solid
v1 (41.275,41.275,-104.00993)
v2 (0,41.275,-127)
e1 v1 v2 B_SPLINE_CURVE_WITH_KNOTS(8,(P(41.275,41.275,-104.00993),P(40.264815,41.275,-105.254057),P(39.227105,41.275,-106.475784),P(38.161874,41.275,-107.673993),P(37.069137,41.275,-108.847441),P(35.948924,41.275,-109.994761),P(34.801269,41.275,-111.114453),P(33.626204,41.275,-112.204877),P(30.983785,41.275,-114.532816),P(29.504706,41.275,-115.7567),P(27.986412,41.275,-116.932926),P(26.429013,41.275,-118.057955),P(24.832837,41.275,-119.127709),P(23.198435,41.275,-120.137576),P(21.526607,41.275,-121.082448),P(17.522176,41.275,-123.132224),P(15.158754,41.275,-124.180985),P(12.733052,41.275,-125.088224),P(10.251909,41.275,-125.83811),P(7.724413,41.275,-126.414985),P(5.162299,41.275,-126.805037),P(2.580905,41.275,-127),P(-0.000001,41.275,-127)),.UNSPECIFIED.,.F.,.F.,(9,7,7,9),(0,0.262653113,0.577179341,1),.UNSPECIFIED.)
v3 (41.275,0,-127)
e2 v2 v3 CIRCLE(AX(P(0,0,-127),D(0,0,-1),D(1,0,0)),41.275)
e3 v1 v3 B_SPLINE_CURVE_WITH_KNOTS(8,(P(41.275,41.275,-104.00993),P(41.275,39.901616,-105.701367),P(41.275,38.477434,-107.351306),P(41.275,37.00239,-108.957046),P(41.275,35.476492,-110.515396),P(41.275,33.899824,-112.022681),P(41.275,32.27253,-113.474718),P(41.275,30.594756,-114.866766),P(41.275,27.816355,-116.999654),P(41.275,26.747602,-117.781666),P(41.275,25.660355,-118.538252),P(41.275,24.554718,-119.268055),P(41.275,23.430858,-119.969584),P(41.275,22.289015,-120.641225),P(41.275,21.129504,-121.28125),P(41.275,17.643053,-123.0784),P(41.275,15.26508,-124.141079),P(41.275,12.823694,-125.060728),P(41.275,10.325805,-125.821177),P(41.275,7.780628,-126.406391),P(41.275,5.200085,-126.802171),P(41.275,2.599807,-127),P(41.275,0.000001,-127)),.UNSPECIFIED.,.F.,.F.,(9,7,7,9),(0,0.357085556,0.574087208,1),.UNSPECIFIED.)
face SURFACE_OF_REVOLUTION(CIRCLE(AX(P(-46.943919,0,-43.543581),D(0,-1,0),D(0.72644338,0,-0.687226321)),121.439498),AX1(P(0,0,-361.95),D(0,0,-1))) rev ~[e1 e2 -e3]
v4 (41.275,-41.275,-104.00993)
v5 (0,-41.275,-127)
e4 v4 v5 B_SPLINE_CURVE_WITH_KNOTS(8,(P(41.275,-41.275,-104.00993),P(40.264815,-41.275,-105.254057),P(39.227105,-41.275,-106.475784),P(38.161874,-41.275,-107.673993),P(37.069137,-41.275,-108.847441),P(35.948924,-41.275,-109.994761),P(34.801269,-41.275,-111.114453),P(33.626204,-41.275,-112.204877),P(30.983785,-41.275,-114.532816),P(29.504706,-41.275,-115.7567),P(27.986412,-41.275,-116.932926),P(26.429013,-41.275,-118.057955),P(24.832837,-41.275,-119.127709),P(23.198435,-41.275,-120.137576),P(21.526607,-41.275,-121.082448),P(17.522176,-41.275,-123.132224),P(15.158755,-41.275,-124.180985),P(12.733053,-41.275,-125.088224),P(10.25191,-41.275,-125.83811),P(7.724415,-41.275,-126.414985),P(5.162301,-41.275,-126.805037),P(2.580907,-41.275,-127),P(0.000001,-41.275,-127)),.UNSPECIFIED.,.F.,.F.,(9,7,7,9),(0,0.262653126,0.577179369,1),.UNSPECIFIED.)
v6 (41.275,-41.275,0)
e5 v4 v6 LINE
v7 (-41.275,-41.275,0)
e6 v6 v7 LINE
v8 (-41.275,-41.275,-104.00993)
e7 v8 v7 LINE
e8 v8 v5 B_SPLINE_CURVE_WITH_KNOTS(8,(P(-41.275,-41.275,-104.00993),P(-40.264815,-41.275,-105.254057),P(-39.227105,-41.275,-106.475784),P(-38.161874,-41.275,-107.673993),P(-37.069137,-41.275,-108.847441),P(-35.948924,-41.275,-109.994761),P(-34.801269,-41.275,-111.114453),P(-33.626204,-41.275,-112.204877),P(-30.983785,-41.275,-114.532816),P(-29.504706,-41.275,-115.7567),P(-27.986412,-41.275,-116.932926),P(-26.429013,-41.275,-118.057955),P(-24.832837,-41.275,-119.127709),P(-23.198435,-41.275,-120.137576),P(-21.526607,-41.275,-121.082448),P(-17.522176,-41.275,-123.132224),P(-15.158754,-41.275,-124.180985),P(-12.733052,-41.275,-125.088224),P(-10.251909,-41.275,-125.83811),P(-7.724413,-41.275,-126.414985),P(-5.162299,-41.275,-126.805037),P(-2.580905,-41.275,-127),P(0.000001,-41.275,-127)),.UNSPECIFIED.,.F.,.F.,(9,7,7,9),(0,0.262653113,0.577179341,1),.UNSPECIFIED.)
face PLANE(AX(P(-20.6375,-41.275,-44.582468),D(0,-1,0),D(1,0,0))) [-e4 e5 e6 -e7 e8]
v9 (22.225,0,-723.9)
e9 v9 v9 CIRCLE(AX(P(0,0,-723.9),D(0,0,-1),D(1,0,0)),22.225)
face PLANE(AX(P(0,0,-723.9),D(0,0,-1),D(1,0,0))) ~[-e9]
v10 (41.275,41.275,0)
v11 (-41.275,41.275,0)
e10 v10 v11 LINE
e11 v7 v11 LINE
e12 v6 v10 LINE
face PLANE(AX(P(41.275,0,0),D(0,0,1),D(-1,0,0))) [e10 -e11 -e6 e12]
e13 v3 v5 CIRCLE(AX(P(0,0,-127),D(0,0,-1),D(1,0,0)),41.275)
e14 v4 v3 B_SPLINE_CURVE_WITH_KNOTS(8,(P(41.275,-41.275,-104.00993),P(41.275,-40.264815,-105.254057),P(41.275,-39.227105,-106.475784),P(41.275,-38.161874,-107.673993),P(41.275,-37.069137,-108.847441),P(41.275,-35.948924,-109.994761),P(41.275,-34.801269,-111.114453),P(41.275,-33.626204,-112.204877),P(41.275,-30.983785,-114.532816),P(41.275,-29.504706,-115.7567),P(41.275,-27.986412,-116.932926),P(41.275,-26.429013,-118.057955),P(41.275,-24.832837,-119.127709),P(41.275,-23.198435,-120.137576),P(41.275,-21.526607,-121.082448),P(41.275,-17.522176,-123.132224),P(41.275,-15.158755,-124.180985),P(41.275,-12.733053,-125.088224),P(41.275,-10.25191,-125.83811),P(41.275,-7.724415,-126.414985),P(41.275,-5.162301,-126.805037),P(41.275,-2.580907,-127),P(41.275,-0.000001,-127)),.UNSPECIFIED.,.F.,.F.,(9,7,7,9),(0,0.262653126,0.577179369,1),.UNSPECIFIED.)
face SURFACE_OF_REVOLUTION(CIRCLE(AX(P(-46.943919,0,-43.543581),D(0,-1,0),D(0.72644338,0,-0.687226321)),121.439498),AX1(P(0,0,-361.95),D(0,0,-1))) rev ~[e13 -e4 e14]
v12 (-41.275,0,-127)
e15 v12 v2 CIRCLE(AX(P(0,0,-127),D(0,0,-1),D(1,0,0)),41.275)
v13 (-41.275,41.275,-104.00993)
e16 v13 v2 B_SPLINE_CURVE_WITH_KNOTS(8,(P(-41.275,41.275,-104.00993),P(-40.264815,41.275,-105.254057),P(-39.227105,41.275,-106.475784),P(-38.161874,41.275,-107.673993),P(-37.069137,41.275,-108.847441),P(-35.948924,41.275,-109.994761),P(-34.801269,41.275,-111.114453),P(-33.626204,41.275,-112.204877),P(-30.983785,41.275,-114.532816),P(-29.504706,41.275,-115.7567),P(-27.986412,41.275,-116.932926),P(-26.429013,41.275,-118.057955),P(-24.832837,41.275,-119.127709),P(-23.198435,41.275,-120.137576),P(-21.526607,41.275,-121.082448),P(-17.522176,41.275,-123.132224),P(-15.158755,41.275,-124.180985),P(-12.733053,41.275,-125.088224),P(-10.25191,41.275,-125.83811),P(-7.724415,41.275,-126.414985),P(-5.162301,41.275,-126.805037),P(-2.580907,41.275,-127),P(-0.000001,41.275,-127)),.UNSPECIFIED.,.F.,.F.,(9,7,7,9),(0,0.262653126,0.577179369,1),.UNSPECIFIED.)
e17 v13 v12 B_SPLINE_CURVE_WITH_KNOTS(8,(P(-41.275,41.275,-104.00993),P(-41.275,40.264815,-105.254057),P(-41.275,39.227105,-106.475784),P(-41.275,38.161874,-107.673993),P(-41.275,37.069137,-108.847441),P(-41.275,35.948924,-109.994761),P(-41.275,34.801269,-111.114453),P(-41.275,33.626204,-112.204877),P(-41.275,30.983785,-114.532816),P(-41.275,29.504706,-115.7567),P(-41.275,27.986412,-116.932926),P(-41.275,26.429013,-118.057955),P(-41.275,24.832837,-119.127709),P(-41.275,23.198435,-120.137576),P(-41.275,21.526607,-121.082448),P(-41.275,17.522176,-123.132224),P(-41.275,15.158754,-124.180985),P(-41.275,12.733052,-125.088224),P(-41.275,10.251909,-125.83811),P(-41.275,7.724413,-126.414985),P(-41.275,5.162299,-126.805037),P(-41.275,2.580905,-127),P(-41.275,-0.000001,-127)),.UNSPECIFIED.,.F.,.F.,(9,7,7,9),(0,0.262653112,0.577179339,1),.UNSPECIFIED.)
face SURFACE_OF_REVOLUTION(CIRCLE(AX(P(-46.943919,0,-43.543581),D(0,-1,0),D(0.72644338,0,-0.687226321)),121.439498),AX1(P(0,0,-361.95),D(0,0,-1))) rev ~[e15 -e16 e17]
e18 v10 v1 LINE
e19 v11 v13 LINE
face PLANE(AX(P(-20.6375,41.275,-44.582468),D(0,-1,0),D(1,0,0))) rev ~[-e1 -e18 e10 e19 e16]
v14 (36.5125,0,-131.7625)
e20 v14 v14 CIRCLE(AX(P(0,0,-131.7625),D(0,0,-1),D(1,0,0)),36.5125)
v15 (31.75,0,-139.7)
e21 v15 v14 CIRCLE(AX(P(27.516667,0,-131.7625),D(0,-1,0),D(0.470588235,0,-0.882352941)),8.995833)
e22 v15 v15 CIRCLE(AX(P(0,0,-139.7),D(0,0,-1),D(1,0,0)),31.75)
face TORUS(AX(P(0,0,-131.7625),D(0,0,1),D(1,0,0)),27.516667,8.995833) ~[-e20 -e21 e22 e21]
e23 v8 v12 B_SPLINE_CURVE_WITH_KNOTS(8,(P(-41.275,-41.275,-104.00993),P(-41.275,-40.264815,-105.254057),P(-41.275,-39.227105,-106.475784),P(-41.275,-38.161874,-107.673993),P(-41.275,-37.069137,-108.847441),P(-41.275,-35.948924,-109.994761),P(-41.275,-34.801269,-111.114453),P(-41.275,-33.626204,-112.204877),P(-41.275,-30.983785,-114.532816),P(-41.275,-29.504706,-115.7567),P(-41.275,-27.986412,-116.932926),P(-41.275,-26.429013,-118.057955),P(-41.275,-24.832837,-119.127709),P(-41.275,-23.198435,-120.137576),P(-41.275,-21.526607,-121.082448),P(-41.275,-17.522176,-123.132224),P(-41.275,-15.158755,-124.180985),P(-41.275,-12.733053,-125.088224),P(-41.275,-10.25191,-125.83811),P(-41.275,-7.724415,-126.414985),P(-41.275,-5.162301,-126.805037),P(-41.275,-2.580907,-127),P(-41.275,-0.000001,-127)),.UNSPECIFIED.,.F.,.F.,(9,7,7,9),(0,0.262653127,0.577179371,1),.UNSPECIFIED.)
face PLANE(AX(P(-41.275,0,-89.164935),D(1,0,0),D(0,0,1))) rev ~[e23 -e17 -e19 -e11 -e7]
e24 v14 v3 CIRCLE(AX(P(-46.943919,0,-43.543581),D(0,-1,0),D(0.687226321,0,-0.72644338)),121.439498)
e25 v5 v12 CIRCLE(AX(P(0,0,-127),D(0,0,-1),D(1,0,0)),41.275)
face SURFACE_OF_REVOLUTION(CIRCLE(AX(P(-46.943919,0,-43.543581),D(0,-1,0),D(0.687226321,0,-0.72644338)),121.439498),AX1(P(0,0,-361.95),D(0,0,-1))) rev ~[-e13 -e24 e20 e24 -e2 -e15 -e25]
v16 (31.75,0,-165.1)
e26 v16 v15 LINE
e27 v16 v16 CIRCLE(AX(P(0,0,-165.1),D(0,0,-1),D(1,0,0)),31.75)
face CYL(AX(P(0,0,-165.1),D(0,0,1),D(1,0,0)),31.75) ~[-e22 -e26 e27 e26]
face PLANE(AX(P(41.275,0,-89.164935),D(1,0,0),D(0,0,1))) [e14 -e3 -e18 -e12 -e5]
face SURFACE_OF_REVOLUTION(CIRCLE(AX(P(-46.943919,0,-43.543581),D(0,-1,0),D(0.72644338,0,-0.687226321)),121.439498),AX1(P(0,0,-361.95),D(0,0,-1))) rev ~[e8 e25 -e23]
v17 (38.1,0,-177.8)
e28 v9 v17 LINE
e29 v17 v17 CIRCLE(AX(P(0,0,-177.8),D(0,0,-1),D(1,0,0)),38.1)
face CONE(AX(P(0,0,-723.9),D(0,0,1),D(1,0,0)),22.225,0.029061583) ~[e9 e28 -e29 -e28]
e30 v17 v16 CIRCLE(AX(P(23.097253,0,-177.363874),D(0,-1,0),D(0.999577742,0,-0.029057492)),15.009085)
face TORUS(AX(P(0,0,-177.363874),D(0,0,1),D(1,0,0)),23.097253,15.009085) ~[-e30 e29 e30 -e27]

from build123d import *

# Parameters (mm, degrees)
F1_W     = 41.275
F1_H     = 89.1649350524
F1_H_2   = 37.8350649476
F2_DEPTH = 41.275
F4_DEPTH = 41.275


# Not quite as in the source:
# - a variable given as a bare number and used for a length is read in inches; the dataset says mm whatever the document's units were


with BuildPart() as f2:
    # F1 (on Front) → F2 (new body, symmetric)
    with BuildSketch(Plane.XZ):
        with Locations((20.6375, -44.5824675262)):
            Rectangle(F1_W, F1_H)
        with Locations((-20.6375, -108.0824675262)):
            Rectangle(F1_W, F1_H_2)
        with Locations((20.6375, -108.0824675262)):
            Rectangle(F1_W, F1_H_2)
    extrude(amount=F2_DEPTH, both=True)

    # F1 (on Front) → F3 (revolve, intersect)
    with BuildSketch(Plane.XZ):
        with BuildLine():
            Line((41.275, -127), (0, -127))
            Line((0, -127), (0, -723.9))
            Line((0, -723.9), (22.225, -723.9))
            Line((22.225, -723.9), (38.1, -177.8))
            ThreePointArc((38.1, -177.8), (36.5217864477, -170.6516067761), (31.75, -165.1))
            Line((31.75, -165.1), (31.75, -139.7))
            ThreePointArc((31.75, -139.7), (35.2305301109, -136.3908180665), (36.5125, -131.7625))
            ThreePointArc((36.5125, -131.7625), (38.9267731534, -129.4142731534), (41.275, -127))
        make_face()
        with Locations((20.6375, -108.0824675262)):
            Rectangle(F1_W, F1_H_2)
        with BuildLine():
            Line((41.275, -89.1649350524), (41.275, -127))
            ThreePointArc((41.275, -127), (55.2047536515, -109.2185398369), (65.6004882321, -89.1649350524))
            Line((65.6004882321, -89.1649350524), (41.275, -89.1649350524))
        make_face()
    revolve(axis=Axis((0, 0, -361.95), (0, 0, -1)), mode=Mode.INTERSECT)

    # F1 (on Front) → F4 (join, symmetric)
    with BuildSketch(Plane.XZ):
        with Locations((-20.6375, -44.5824675262)):
            Rectangle(F1_W, F1_H)
        with Locations((20.6375, -44.5824675262)):
            Rectangle(F1_W, F1_H)
    extrude(amount=F4_DEPTH, both=True)

    # F1 (on Front) → F5 (revolve)
    with BuildSketch(Plane.XZ):
        with BuildLine():
            Line((41.275, -127), (0, -127))
            Line((0, -127), (0, -723.9))
            Line((0, -723.9), (22.225, -723.9))
            Line((22.225, -723.9), (38.1, -177.8))
            ThreePointArc((38.1, -177.8), (36.5217864477, -170.6516067761), (31.75, -165.1))
            Line((31.75, -165.1), (31.75, -139.7))
            ThreePointArc((31.75, -139.7), (35.2305301109, -136.3908180665), (36.5125, -131.7625))
            ThreePointArc((36.5125, -131.7625), (38.9267731534, -129.4142731534), (41.275, -127))
        make_face()
    revolve(axis=Axis((0, 0, -361.95), (0, 0, -1)))


solid = f2.part
